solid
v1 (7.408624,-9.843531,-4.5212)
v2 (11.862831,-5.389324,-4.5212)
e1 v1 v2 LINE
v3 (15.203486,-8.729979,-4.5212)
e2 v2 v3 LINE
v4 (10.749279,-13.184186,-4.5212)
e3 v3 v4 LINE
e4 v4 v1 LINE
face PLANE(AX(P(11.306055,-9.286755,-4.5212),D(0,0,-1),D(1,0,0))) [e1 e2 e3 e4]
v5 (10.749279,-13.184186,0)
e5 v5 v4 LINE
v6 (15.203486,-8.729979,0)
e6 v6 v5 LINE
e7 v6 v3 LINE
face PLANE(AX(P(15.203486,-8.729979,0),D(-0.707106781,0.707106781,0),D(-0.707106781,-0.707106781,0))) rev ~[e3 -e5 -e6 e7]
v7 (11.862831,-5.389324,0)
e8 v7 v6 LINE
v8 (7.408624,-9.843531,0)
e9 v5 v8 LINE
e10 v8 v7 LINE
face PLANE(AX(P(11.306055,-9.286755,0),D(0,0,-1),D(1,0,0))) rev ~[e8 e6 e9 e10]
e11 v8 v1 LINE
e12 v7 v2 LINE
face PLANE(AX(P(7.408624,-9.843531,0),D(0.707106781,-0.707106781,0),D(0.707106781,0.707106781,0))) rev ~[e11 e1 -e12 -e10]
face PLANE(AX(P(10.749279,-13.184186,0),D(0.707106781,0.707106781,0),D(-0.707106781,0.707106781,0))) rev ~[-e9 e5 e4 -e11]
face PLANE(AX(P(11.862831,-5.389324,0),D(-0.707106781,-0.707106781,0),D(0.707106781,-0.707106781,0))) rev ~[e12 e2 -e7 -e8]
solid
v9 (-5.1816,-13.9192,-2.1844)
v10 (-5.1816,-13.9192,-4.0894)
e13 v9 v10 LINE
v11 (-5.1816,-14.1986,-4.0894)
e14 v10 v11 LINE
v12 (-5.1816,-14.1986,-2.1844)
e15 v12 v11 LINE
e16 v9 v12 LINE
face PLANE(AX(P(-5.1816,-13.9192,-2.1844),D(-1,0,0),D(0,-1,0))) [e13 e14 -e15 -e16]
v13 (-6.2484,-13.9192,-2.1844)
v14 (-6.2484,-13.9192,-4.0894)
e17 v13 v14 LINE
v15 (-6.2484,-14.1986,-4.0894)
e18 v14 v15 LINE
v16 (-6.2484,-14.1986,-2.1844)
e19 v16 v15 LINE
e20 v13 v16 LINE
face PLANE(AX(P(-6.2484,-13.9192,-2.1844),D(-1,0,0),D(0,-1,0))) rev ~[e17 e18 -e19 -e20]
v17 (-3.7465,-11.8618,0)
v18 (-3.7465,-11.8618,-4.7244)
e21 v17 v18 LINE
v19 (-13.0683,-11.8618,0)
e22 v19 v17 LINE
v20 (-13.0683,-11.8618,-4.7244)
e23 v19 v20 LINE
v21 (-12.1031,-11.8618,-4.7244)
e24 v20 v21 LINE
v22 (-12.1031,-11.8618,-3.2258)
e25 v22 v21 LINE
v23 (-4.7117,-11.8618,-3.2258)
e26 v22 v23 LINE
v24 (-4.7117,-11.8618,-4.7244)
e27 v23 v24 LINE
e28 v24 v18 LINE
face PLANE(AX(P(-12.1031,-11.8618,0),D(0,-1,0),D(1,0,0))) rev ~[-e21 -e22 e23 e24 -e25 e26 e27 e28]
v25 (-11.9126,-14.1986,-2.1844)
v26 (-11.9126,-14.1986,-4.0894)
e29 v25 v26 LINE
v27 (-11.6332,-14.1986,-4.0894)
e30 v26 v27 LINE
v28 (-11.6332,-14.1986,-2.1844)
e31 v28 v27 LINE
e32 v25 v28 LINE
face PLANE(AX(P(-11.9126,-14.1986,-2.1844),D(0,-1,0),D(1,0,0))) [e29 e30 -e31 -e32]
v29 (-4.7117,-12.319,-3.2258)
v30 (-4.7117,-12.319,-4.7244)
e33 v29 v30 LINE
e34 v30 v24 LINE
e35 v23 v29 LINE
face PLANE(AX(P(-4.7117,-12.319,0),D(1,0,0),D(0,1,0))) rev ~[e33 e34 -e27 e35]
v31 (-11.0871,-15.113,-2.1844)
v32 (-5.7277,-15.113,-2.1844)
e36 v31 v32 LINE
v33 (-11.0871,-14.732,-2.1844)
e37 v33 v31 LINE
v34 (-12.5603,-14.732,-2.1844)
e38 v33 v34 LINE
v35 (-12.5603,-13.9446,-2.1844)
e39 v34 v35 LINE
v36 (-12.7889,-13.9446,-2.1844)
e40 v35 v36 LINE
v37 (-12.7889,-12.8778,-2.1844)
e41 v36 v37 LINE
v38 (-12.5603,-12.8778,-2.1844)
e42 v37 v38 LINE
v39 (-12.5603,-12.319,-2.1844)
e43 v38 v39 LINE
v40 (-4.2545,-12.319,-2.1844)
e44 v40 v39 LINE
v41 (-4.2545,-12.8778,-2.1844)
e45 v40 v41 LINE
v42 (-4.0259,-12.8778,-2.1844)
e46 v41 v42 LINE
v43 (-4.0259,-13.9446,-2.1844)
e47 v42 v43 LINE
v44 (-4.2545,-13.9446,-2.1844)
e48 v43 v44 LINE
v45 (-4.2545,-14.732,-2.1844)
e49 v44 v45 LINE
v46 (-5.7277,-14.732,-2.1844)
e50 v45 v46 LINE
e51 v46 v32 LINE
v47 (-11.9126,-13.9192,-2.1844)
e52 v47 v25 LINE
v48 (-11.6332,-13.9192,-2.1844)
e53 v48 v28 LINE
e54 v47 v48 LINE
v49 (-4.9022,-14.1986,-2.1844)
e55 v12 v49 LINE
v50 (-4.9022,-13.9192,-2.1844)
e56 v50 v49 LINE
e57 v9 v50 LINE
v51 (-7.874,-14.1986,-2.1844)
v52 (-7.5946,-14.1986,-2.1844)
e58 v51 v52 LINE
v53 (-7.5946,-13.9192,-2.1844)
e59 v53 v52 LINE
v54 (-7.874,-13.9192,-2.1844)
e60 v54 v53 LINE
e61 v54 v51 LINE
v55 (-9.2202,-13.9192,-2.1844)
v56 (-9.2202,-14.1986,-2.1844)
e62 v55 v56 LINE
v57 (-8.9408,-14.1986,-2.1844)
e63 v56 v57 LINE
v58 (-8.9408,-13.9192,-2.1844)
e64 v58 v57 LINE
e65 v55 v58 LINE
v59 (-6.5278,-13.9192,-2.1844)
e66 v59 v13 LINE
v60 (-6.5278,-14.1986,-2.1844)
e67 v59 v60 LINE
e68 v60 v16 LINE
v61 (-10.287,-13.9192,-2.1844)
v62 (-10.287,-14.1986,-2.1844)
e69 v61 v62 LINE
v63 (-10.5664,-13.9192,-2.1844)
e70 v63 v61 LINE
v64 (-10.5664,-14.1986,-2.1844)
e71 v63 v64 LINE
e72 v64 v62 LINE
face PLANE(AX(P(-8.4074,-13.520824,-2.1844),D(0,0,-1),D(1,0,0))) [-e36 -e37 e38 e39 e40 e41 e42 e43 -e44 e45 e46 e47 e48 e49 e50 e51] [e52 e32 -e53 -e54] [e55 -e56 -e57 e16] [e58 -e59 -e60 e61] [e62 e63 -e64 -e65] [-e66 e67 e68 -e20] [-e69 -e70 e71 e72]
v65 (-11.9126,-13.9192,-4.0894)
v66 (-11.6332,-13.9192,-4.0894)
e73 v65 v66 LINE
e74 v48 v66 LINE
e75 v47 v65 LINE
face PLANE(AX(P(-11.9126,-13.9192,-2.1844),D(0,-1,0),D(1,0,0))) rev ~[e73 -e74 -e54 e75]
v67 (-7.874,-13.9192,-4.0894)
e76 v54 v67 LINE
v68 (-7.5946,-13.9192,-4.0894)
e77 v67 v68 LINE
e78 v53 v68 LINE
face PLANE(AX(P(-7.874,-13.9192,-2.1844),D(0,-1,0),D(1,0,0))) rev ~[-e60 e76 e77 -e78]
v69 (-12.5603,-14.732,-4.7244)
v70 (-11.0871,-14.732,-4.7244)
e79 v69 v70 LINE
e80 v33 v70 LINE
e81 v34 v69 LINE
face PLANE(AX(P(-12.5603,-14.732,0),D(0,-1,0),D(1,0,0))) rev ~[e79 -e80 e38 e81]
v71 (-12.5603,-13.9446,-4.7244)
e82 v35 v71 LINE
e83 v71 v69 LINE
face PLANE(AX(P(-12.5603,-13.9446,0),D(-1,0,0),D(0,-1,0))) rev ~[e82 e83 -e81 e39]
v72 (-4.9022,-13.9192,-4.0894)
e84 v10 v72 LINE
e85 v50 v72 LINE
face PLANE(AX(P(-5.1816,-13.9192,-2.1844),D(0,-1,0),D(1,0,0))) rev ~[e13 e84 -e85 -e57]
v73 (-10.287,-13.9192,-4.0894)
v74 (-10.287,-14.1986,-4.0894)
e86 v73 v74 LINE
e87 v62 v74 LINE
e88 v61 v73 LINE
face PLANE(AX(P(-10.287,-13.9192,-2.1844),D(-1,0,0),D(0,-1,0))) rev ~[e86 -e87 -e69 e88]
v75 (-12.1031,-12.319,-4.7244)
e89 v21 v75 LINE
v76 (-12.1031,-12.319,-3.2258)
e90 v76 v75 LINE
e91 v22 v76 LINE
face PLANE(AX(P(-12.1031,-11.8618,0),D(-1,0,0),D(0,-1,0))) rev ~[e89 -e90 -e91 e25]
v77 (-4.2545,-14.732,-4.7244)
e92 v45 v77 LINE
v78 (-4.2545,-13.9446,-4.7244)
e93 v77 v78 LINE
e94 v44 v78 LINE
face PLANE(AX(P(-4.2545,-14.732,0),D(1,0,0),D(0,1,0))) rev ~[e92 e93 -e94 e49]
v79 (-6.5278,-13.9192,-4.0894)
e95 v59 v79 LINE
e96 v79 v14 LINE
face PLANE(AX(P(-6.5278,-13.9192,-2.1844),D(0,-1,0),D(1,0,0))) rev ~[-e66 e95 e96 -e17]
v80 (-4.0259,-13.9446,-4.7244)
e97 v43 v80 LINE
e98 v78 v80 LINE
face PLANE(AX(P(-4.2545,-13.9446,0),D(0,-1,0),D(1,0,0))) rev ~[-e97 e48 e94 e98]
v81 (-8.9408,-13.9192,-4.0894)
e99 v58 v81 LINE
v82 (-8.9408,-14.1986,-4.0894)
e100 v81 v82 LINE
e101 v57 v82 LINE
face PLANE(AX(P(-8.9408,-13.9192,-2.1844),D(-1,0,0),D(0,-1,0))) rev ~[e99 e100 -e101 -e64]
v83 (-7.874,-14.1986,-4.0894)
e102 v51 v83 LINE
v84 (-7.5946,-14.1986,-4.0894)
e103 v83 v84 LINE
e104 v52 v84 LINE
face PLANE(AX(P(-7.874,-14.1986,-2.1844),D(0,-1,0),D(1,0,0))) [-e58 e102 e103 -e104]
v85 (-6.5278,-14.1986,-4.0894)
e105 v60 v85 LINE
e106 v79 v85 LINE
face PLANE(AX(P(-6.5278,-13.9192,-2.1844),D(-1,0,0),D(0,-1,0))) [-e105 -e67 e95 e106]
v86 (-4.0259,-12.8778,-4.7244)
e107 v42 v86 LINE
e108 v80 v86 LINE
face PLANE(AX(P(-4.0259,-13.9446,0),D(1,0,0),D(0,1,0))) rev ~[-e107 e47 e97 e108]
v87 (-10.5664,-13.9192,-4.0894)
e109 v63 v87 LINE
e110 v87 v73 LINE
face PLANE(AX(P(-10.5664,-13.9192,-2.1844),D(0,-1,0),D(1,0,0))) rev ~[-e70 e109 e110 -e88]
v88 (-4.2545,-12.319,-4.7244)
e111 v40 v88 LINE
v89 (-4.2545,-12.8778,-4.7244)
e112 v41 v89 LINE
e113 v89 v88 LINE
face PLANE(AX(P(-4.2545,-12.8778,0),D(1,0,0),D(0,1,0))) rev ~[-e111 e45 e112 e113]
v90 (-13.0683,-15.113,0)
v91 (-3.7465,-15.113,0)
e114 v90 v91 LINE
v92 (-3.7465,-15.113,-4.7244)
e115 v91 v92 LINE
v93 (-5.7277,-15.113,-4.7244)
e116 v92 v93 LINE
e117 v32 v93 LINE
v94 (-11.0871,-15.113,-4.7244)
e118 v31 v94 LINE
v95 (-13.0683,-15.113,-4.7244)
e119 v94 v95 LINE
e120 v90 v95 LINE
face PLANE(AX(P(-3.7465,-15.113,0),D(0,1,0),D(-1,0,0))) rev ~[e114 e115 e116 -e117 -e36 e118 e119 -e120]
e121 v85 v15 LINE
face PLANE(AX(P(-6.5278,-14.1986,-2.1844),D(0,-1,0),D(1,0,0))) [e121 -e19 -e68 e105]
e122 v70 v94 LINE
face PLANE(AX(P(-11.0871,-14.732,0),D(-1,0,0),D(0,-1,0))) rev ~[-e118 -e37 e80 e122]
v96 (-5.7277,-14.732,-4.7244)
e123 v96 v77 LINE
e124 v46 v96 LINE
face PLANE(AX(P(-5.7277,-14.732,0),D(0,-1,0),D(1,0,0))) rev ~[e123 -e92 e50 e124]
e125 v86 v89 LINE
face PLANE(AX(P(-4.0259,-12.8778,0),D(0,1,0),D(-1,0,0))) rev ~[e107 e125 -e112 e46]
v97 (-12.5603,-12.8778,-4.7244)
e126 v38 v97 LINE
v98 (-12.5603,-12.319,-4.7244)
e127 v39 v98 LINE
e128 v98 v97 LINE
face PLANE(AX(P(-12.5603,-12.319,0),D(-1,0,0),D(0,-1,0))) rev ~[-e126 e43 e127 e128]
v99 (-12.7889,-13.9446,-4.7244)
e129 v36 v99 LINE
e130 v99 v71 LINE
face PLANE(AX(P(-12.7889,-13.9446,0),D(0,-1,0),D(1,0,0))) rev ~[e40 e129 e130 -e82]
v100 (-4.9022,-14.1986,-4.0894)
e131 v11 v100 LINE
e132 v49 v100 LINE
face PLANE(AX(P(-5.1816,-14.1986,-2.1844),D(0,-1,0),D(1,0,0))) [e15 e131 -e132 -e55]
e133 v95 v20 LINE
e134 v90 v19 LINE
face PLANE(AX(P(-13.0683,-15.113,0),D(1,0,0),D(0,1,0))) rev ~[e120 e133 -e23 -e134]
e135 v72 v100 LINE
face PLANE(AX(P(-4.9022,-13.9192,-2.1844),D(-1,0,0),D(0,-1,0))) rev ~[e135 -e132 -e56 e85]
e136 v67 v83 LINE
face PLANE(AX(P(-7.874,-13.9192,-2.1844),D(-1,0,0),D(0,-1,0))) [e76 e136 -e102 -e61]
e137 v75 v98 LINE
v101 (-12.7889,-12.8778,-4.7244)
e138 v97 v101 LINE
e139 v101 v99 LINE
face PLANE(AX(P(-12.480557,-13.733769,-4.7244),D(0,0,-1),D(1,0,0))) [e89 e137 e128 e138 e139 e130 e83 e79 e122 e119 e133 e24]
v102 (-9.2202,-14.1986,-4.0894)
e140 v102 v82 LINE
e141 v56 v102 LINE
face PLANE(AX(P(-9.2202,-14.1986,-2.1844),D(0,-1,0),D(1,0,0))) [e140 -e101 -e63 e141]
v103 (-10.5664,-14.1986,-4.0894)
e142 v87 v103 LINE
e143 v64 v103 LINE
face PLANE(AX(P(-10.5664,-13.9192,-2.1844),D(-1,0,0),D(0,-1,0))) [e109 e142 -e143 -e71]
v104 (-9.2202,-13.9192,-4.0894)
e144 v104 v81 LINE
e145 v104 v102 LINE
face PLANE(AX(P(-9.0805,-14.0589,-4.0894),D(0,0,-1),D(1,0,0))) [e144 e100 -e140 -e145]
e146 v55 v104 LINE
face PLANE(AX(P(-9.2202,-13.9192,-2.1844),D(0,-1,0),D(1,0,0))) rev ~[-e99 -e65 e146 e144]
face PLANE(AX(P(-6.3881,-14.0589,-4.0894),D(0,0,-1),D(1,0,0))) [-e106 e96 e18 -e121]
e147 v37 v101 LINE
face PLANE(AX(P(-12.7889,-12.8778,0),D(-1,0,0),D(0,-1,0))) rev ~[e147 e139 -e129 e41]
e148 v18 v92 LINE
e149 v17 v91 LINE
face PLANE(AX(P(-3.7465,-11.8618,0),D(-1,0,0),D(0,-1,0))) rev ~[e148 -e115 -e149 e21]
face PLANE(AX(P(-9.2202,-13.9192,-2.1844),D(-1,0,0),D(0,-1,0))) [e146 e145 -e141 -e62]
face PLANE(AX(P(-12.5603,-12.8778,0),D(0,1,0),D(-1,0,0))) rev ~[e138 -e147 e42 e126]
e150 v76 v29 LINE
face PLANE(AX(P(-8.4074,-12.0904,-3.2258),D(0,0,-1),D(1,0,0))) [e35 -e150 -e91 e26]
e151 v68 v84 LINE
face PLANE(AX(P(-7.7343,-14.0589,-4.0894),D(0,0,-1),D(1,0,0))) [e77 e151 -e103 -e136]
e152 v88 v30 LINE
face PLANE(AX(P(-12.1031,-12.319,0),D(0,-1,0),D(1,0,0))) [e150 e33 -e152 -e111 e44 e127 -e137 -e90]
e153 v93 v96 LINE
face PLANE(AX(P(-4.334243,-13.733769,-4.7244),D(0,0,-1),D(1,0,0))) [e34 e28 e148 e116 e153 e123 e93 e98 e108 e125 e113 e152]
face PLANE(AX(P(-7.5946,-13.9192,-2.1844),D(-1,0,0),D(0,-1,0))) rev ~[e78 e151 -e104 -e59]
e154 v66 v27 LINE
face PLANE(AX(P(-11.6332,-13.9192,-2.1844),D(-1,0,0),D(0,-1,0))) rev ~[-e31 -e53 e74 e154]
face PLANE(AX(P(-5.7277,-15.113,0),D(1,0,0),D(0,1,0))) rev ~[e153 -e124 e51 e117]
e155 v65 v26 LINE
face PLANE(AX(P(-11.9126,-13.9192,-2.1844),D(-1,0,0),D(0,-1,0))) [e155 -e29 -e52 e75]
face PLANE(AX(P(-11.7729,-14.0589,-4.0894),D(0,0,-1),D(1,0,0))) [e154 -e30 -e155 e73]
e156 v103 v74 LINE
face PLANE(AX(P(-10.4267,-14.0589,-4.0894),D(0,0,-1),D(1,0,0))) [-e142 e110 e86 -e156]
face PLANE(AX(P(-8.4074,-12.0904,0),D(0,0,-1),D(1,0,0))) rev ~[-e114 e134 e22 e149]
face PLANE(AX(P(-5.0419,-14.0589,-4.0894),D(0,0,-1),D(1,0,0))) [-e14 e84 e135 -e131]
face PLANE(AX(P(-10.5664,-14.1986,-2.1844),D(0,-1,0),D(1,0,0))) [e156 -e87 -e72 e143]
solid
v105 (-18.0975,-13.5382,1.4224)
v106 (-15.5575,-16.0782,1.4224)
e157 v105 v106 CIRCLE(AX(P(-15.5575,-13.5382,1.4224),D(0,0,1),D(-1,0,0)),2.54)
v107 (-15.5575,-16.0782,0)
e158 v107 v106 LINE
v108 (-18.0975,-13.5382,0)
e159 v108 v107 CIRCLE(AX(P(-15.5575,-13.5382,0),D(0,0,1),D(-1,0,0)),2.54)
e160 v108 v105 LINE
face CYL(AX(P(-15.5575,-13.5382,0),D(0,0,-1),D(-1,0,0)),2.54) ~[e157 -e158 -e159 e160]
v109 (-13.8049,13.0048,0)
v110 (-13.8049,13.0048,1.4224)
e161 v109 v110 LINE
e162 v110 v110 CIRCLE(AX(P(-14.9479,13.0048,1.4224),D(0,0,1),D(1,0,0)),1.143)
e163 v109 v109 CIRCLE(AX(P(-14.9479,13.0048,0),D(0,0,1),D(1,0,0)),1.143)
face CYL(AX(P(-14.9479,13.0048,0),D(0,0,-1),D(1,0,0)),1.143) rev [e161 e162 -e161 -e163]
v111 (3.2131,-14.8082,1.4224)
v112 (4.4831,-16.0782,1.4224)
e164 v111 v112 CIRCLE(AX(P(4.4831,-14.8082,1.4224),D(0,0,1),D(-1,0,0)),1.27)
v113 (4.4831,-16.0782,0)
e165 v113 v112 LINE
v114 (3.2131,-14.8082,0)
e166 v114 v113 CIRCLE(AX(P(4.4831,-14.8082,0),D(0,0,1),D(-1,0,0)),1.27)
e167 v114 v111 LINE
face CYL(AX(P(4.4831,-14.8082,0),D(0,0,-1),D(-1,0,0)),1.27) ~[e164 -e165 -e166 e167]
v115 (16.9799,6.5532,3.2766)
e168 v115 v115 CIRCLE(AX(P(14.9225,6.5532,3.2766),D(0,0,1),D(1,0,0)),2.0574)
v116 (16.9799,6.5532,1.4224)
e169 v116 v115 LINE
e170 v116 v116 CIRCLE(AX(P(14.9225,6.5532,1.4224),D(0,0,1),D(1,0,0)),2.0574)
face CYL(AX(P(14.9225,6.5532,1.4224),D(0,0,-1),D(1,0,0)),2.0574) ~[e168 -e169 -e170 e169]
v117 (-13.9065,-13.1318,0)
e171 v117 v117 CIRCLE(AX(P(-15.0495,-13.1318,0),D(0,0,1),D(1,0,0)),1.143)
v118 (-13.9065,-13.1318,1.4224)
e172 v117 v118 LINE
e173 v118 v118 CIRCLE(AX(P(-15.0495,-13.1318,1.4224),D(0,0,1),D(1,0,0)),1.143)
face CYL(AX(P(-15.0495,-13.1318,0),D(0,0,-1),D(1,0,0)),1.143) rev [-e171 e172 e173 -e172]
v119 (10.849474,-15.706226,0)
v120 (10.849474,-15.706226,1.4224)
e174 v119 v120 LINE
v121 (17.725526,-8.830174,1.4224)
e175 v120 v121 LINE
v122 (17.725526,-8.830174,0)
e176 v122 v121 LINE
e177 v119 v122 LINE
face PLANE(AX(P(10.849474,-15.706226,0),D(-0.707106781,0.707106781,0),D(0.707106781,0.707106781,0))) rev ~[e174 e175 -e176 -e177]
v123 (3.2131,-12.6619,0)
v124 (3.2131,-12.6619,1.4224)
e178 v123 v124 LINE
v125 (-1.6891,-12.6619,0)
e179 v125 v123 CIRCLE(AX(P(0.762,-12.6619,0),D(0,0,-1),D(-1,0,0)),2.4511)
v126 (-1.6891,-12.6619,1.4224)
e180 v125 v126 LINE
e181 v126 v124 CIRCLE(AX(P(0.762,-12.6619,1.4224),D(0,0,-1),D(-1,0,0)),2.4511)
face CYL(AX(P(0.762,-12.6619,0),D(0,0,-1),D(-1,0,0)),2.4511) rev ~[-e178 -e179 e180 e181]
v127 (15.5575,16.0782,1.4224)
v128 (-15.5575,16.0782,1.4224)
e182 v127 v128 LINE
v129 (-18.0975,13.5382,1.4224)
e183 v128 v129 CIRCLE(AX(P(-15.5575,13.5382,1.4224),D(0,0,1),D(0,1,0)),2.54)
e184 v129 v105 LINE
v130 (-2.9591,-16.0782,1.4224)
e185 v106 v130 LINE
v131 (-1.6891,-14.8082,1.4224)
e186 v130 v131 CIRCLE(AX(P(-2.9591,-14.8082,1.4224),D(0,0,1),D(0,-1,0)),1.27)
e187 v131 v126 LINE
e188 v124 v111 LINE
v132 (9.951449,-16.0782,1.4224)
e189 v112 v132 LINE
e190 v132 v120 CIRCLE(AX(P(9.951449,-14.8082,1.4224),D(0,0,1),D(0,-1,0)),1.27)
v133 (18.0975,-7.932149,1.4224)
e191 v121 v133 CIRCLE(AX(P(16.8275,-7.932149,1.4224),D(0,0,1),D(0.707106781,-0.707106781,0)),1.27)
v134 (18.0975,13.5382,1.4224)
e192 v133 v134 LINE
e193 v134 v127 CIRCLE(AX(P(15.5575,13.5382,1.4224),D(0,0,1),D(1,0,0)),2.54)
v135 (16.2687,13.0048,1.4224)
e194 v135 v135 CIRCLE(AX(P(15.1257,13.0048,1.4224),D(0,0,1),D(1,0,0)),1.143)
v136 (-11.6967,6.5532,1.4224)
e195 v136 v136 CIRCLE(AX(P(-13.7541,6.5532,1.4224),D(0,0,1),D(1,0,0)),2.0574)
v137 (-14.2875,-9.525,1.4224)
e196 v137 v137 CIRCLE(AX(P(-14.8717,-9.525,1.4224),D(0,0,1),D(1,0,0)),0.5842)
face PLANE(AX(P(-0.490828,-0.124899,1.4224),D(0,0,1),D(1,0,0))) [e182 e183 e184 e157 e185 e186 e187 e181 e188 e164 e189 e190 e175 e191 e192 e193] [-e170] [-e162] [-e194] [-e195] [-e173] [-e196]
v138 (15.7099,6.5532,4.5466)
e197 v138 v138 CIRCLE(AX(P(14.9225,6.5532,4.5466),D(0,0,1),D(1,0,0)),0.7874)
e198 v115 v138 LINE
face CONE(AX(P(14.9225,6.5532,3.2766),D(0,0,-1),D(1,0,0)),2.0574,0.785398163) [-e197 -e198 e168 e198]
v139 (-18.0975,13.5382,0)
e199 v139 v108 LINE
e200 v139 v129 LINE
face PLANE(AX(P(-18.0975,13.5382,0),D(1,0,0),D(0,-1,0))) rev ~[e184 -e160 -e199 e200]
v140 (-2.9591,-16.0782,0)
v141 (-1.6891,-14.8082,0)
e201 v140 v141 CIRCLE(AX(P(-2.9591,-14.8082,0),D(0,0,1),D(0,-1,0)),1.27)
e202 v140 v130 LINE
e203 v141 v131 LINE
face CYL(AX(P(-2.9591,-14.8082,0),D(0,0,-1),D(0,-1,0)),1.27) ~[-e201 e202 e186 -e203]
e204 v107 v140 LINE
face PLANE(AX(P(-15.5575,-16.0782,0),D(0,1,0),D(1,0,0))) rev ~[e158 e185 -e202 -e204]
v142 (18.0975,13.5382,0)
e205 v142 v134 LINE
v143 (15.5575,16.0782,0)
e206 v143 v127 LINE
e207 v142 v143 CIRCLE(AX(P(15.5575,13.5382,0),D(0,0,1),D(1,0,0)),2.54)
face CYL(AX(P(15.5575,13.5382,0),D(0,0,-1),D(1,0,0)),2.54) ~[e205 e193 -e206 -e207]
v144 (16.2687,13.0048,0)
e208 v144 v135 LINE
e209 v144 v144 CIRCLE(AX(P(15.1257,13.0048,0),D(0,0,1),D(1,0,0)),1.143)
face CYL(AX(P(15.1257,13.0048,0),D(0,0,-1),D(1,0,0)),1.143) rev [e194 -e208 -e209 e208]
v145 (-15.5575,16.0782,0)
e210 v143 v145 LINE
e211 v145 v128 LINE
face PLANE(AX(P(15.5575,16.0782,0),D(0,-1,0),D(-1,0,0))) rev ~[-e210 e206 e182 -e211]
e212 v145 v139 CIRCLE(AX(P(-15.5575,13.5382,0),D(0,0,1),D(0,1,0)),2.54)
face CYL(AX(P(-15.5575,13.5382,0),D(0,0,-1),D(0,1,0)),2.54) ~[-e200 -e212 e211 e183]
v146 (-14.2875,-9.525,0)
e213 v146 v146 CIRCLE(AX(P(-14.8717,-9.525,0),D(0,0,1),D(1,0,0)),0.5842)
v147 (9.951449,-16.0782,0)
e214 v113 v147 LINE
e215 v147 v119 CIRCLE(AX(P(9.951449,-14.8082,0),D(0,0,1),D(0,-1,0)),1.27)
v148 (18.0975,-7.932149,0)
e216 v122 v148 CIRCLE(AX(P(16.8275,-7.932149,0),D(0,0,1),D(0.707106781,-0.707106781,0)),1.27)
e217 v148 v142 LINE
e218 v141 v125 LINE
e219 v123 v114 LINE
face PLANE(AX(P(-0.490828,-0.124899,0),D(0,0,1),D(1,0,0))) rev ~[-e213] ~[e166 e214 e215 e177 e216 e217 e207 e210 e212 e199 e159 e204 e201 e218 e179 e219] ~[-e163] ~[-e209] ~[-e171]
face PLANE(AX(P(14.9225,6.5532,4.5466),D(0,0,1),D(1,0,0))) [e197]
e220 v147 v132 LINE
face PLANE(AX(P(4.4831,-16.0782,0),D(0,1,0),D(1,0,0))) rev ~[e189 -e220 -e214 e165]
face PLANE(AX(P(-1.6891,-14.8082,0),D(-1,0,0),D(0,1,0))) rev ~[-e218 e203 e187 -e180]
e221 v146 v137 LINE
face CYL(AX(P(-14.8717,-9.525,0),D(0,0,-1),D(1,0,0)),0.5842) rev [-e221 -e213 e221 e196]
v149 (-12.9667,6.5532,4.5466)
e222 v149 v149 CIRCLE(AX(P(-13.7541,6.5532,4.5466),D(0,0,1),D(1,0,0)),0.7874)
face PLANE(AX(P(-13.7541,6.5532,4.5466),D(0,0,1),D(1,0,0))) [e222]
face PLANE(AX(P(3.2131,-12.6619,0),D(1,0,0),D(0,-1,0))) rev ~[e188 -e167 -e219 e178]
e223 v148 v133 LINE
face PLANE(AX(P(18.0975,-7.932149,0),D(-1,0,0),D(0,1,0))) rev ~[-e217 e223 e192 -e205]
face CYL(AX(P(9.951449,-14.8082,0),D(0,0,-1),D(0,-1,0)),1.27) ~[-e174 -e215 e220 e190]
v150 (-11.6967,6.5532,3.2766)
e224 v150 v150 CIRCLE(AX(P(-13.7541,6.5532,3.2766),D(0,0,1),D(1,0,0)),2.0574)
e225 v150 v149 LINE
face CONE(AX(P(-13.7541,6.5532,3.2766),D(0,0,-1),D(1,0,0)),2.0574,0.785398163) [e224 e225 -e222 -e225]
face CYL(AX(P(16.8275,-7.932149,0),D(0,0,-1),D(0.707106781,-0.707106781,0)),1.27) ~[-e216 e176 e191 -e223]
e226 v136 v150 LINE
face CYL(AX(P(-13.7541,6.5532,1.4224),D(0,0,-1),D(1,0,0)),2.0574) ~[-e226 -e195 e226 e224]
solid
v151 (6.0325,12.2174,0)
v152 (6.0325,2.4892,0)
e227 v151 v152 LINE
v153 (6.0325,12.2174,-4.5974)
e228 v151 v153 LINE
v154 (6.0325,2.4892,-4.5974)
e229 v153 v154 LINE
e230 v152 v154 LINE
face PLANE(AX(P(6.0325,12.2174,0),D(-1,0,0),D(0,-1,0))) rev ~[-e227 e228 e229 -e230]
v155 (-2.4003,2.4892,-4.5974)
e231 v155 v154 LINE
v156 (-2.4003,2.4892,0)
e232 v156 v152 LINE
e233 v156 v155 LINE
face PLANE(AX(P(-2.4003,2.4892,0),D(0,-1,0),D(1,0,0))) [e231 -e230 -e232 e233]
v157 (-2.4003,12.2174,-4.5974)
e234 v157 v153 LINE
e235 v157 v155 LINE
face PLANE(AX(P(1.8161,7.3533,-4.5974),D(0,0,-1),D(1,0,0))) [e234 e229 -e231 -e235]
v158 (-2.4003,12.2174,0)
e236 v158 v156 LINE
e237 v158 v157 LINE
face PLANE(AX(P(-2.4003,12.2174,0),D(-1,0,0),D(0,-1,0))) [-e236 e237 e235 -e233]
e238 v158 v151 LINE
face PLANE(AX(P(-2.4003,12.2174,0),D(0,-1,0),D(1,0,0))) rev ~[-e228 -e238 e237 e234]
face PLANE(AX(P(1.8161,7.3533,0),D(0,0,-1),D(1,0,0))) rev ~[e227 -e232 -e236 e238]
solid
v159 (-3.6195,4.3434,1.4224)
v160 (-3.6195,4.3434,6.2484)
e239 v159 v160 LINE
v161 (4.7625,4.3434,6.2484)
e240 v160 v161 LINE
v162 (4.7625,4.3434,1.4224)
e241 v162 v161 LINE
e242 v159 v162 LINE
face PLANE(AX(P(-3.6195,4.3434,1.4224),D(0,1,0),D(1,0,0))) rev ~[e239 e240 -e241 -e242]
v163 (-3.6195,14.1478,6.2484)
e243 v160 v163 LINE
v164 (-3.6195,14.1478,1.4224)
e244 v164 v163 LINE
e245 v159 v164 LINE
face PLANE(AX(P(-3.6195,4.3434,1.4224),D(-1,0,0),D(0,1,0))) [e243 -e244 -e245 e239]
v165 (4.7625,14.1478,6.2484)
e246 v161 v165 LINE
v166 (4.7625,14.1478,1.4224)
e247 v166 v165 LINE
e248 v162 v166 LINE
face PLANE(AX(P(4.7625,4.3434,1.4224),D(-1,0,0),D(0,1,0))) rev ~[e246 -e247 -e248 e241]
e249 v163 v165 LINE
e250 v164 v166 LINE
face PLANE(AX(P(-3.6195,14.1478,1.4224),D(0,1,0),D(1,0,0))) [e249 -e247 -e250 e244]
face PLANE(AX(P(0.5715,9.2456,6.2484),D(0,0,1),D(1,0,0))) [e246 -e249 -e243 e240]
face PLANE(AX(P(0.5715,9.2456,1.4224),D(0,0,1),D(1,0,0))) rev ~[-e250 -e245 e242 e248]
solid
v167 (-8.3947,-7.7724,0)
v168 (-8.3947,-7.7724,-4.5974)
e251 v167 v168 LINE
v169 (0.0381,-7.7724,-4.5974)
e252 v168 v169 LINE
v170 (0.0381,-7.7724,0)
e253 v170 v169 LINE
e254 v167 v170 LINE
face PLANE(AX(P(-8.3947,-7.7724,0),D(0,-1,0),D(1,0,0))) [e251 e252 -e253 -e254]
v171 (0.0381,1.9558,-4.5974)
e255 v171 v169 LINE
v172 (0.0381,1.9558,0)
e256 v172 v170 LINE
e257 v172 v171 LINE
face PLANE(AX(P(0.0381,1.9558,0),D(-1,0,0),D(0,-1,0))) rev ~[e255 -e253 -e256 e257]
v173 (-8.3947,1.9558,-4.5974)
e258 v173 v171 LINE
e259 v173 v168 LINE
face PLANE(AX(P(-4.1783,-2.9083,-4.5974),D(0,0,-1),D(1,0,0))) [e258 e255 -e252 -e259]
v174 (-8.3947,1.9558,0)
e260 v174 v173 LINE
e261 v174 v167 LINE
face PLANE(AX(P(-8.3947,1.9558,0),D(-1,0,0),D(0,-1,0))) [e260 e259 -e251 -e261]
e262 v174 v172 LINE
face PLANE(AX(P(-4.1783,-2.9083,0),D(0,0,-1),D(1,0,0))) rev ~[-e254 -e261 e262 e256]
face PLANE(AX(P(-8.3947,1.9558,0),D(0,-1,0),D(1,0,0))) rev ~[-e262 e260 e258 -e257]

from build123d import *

# Parameters (mm, degrees)
F0_R      = 1.143
F0_R_2    = 0.5842
F1_DEPTH  = 1.4224
F2_W      = 8.382
F2_H      = 9.8044
F3_DEPTH  = 4.826
F2_R      = 2.0574
F4_DEPTH  = 3.1242
F5_SIZE   = 1.27
F6_W      = 8.4328
F6_H      = 9.7282
F7_DEPTH  = 4.5974
F8_DEPTH  = 4.5212
F9_W      = 5.3594
F9_H      = 0.381
F10_DEPTH = 2.1844
F11_DEPTH = 4.7244
F9_W_2    = 7.3914
F9_H_2    = 0.4572
F12_DEPTH = 3.2258
F13_W     = 0.2794
F13_H     = 0.2794
F14_DEPTH = 1.905


with BuildPart() as f1:
    # F0 (on Top) → F1 (new body)
    with BuildSketch(Plane.XY):
        with BuildLine():
            Line((15.5575, 16.0782), (-15.5575, 16.0782))
            ThreePointArc((-15.5575, 16.0782), (-17.3535512242, 15.3342512242), (-18.0975, 13.5382))
            Line((-18.0975, 13.5382), (-18.0975, -13.5382))
            ThreePointArc((-18.0975, -13.5382), (-17.3535512242, -15.3342512242), (-15.5575, -16.0782))
            Line((-15.5575, -16.0782), (-2.9591, -16.0782))
            ThreePointArc((-2.9591, -16.0782), (-2.0610743879, -15.7062256121), (-1.6891, -14.8082))
            Line((-1.6891, -14.8082), (-1.6891, -12.6619))
            ThreePointArc((-1.6891, -12.6619), (0.762, -10.2108), (3.2131, -12.6619))
            Line((3.2131, -12.6619), (3.2131, -14.8082))
            ThreePointArc((3.2131, -14.8082), (3.5850743879, -15.7062256121), (4.4831, -16.0782))
            Line((4.4831, -16.0782), (9.9514487758, -16.0782))
            ThreePointArc((9.9514487758, -16.0782), (10.4374567349, -15.9815270063), (10.8494743879, -15.7062256121))
            Line((10.8494743879, -15.7062256121), (17.7255256121, -8.8301743879))
            ThreePointArc((17.7255256121, -8.8301743879), (18.0008270063, -8.4181567349), (18.0975, -7.9321487758))
            Line((18.0975, -7.9321487758), (18.0975, 13.5382))
            ThreePointArc((18.0975, 13.5382), (17.3535512242, 15.3342512242), (15.5575, 16.0782))
        make_face()
        with Locations((-15.0495, -13.1318)):
            Circle(F0_R, mode=Mode.SUBTRACT)
        with Locations((-14.8717, -9.525)):
            Circle(F0_R_2, mode=Mode.SUBTRACT)
        with Locations((-14.9479, 13.0048)):
            Circle(F0_R, mode=Mode.SUBTRACT)
        with Locations((15.1257, 13.0048)):
            Circle(F0_R, mode=Mode.SUBTRACT)
    extrude(amount=F1_DEPTH)

    # F2 (on face) → F4 (join)
    with BuildSketch(Plane.XY.offset(1.4224)):
        with Locations((-13.7541, 6.5532)):
            Circle(F2_R)
        with Locations((14.9225, 6.5532)):
            Circle(F2_R)
    extrude(amount=F4_DEPTH)

    # F5
    f5_edges = [f1.edges().sort_by_distance(p)[0] for p in [
        (-15.8115, 6.5532, 4.5466),
        (12.8651, 6.5532, 4.5466),
    ]]
    chamfer(f5_edges, length=F5_SIZE)


with BuildPart() as f3:
    # F2 (on face) → F3 (new body)
    with BuildSketch(Plane.XY.offset(1.4224)):
        with Locations((0.5715, 9.2456)):
            Rectangle(F2_W, F2_H)
    extrude(amount=F3_DEPTH)


with BuildPart() as f7:
    # F6 (on face) → F7 (new body)
    with BuildSketch(Plane(origin=(0, 0, 0), x_dir=(1, 0, 0), z_dir=(0, 0, -1))):
        with Locations((1.8161, -7.3533)):
            Rectangle(F6_W, F6_H)
    extrude(amount=F7_DEPTH)


with BuildPart() as f7b:
    # F6 (on face) → F7, piece 2 (new body)
    with BuildSketch(Plane(origin=(0, 0, 0), x_dir=(1, 0, 0), z_dir=(0, 0, -1))):
        with Locations((-4.1783, 2.9083)):
            Rectangle(F6_W, F6_H)
    extrude(amount=F7_DEPTH)


with BuildPart() as f8:
    # F6 (on face) → F8 (new body)
    with BuildSketch(Plane(origin=(0, 0, 0), x_dir=(1, 0, 0), z_dir=(0, 0, -1))):
        Polygon((11.8628308473, 5.3893238113), (15.2034861243, 8.7299790883), (10.7492790883, 13.1841861243), (7.4086238113, 9.8435308473), align=None)
    extrude(amount=F8_DEPTH)


with BuildPart() as f10:
    # F9 (on face) → F10 (new body)
    with BuildSketch(Plane(origin=(0, 0, 0), x_dir=(1, 0, 0), z_dir=(0, 0, -1))):
        Polygon((-12.1031, 12.319), (-4.7117, 12.319), (-4.2545, 12.319), (-4.2545, 12.8778), (-4.0259, 12.8778), (-4.0259, 13.9446), (-4.2545, 13.9446), (-4.2545, 14.732), (-5.7277, 14.732), (-11.0871, 14.732), (-12.5603, 14.732), (-12.5603, 13.9446), (-12.7889, 13.9446), (-12.7889, 12.8778), (-12.5603, 12.8778), (-12.5603, 12.319), align=None)
        with Locations((-8.4074, 14.9225)):
            Rectangle(F9_W, F9_H)
    extrude(amount=F10_DEPTH)

    # F9 (on face) → F11 (join)
    with BuildSketch(Plane(origin=(0, 0, 0), x_dir=(1, 0, 0), z_dir=(0, 0, -1))):
        Polygon((-4.7117, 11.8618), (-3.7465, 11.8618), (-3.7465, 15.113), (-5.7277, 15.113), (-5.7277, 14.732), (-4.2545, 14.732), (-4.2545, 13.9446), (-4.0259, 13.9446), (-4.0259, 12.8778), (-4.2545, 12.8778), (-4.2545, 12.319), (-4.7117, 12.319), align=None)
        Polygon((-13.0683, 11.8618), (-12.1031, 11.8618), (-12.1031, 12.319), (-12.5603, 12.319), (-12.5603, 12.8778), (-12.7889, 12.8778), (-12.7889, 13.9446), (-12.5603, 13.9446), (-12.5603, 14.732), (-11.0871, 14.732), (-11.0871, 15.113), (-13.0683, 15.113), align=None)
    extrude(amount=F11_DEPTH)

    # F9 (on face) → F12 (join)
    with BuildSketch(Plane(origin=(0, 0, 0), x_dir=(1, 0, 0), z_dir=(0, 0, -1))):
        with Locations((-8.4074, 12.0904)):
            Rectangle(F9_W_2, F9_H_2)
    extrude(amount=F12_DEPTH)

    # F13 (on face) → F14 (join)
    with BuildSketch(Plane(origin=(0, 0, -2.1844), x_dir=(1, 0, 0), z_dir=(0, 0, -1))):
        with Locations((-11.7729, 14.0589)):
            Rectangle(F13_W, F13_H)
        with Locations((-10.4267, 14.0589)):
            Rectangle(F13_W, F13_H)
        with Locations((-9.0805, 14.0589)):
            Rectangle(F13_W, F13_H)
        with Locations((-5.0419, 14.0589)):
            Rectangle(F13_W, F13_H)
        with Locations((-6.3881, 14.0589)):
            Rectangle(F13_W, F13_H)
        with Locations((-7.7343, 14.0589)):
            Rectangle(F13_W, F13_H)
    extrude(amount=F14_DEPTH)


solid = Compound([f1.part, f3.part, f7.part, f7b.part, f8.part, f10.part])
